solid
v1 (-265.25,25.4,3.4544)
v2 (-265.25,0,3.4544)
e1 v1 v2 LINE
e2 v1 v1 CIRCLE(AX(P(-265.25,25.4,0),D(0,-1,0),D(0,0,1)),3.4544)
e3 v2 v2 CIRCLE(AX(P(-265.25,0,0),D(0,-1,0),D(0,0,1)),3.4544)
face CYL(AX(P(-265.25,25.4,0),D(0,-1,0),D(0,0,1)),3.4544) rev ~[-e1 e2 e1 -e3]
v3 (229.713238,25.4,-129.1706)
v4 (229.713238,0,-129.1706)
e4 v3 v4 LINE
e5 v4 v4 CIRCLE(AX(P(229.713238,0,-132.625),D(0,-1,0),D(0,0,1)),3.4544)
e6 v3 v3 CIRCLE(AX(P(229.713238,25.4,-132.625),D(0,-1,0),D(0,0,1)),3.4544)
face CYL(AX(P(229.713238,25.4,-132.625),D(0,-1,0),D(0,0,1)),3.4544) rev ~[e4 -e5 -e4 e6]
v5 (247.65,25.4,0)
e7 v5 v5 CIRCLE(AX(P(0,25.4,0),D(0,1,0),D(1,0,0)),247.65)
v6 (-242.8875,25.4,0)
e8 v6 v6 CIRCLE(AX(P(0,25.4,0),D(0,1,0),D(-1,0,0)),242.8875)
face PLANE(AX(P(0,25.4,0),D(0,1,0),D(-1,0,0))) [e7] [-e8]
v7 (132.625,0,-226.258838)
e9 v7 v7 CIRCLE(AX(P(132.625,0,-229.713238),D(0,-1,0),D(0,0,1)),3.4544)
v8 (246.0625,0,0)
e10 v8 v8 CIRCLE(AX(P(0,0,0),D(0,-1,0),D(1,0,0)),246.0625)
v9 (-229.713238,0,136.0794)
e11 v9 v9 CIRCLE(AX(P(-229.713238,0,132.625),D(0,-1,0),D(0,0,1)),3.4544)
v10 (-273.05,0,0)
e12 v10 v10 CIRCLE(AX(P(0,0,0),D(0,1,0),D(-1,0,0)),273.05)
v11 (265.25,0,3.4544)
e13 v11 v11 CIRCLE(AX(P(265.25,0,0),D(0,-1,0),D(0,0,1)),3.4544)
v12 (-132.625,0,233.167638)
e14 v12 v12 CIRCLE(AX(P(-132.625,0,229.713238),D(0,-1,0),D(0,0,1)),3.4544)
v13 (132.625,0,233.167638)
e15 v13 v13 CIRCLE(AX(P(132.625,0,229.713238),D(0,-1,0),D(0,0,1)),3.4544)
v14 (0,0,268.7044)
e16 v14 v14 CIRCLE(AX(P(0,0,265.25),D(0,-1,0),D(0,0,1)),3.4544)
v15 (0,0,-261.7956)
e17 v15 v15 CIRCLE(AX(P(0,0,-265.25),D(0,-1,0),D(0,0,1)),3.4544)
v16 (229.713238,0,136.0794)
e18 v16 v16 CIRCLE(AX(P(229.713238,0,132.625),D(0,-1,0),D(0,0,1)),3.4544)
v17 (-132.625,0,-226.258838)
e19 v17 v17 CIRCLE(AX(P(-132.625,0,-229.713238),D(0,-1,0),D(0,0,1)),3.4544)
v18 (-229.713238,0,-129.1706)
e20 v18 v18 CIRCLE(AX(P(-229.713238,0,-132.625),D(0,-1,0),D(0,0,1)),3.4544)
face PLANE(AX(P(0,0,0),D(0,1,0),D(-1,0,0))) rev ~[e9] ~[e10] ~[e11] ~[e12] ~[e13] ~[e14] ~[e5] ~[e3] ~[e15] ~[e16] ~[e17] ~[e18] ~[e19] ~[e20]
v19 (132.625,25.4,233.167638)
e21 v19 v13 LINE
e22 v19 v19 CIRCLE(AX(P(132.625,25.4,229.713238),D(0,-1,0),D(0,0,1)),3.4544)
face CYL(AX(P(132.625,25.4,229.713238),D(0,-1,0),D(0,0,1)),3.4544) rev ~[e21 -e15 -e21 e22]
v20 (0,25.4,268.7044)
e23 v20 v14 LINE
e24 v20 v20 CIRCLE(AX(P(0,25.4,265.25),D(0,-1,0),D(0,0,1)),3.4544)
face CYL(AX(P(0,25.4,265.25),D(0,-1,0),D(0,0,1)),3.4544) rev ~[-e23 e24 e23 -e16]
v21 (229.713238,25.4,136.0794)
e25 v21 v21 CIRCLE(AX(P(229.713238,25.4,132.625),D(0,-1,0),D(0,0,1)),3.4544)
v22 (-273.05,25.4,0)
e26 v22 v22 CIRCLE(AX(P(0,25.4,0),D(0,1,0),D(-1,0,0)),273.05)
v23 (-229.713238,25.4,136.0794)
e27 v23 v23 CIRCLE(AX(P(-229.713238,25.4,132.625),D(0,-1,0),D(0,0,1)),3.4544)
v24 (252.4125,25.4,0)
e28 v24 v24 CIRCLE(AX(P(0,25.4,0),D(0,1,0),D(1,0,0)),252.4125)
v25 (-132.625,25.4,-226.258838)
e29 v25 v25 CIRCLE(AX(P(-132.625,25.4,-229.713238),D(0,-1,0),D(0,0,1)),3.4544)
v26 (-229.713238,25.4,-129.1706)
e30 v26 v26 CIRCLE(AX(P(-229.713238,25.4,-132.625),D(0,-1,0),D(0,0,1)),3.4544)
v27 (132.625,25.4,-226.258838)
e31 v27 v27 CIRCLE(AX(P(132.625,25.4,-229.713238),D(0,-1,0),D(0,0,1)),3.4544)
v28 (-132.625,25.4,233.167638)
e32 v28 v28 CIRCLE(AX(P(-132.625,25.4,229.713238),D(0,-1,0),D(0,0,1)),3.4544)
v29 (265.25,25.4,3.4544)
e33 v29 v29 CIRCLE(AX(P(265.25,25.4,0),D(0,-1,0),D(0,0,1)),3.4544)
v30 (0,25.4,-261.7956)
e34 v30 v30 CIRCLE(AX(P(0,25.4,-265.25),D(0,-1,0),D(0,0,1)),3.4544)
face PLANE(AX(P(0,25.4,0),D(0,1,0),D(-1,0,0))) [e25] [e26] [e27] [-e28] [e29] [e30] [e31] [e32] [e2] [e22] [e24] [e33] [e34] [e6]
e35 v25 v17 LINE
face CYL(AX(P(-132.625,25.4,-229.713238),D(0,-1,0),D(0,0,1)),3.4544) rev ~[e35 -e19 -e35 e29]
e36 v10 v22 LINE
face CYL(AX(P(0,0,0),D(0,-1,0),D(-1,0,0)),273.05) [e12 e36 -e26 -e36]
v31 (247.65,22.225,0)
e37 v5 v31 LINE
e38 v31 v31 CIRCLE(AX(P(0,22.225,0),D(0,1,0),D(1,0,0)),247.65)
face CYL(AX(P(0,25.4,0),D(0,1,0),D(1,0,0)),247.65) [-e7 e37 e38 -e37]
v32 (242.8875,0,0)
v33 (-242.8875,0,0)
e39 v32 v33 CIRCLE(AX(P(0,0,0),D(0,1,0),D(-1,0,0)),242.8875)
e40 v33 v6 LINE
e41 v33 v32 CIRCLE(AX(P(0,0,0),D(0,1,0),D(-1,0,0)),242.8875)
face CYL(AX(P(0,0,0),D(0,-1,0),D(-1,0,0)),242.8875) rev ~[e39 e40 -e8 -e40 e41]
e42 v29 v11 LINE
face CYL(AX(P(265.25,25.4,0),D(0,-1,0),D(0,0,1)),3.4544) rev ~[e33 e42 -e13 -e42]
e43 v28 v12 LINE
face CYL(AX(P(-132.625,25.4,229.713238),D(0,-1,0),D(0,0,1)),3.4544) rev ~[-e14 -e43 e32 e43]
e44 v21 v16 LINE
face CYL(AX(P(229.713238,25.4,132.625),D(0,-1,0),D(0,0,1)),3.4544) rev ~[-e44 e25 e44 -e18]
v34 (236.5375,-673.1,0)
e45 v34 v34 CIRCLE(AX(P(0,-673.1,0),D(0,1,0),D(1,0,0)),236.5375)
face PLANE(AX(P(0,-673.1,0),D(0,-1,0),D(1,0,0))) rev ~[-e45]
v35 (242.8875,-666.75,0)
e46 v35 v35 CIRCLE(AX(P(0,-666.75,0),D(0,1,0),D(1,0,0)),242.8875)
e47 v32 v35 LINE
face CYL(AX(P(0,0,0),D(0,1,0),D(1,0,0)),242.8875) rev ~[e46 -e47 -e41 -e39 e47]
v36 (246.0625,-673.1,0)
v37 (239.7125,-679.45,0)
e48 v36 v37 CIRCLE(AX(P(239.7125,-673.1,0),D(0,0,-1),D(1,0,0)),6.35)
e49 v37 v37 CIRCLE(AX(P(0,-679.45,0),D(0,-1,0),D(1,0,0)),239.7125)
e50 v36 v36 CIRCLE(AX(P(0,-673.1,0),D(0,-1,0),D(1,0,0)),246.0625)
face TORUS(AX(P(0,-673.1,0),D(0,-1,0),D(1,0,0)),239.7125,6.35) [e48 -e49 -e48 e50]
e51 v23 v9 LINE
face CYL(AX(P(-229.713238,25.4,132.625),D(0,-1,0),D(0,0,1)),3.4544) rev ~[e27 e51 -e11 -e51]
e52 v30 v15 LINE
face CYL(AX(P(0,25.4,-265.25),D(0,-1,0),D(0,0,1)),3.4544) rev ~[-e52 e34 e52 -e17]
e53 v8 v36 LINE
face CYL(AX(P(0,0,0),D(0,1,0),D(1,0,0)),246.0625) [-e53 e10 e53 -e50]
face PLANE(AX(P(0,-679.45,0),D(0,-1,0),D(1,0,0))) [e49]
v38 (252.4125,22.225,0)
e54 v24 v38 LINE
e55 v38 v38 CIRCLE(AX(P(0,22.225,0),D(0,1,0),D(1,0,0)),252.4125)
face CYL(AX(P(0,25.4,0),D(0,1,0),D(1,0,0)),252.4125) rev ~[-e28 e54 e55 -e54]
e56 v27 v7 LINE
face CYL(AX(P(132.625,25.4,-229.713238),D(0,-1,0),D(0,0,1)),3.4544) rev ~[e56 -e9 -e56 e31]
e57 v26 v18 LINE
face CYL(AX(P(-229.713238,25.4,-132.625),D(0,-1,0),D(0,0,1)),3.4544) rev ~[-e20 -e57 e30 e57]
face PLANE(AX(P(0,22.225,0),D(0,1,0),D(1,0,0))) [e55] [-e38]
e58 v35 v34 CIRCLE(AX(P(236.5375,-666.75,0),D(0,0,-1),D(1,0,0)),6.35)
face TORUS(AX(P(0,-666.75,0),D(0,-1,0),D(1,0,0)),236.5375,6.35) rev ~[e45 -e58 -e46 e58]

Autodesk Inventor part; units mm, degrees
ref_plane "YZ Plane" through (0, 0, 0) normal (1, 0, 0) x (0, 1, 0)
ref_plane "XZ Plane" through (0, 0, 0) normal (0, 1, 0) x (-1, 0, 0)
ref_plane "XY Plane" through (0, 0, 0) normal (0, 0, 1) x (1, 0, 0)
sketch "Sketch1" plane through (0, 0, 0) normal (0, 1, 0) x (-1, 0, 0)
  circle A0 centre (0, 0) radius 273.05
  circle A1 centre (0, 0) radius 242.8875
  dimension "d0" = 546.1
  dimension "d1" = 485.775
extrude "Extrusion1" add sketch "Sketch1" along normal blind 25.4
sketch "Sketch2" plane through (0, 25.4, 0) normal (0, 1, 0) x (1, 0, 0)
  circle A0 centre (0, 0) radius 247.65
  circle A1 centre (0, 0) radius 252.4125
  dimension "d4" = 495.3
  dimension "d5" = 504.825
extrude "Extrusion2" cut sketch "Sketch2" against normal blind 3.175
sketch "Sketch3" plane through (0, 25.4, 0) normal (0, 1, 0) x (1, 0, 0)
  line L0 (0, 0) -> (-265.25, 0) construction
  dimension "d8" = 265.25
hole "Hole1" at (-265.25, 25.4, 0) direction (0, -1, 0) diameter 6.9088 end up to surface
pattern_circular "Circular Pattern1" count 12 over 360 about axis through (0, -10, 0) along (0, 1, 0) of "Hole1"
sketch "Sketch4" plane through (0, 0, 0) normal (0, -1, 0) x (1, 0, 0)
  circle A0 centre (0, 0) radius 242.8875
  circle A1 centre (0, 0) radius 246.0625
  dimension "d19" = 485.775
  dimension "d20" = 492.125
extrude "Extrusion3" add sketch "Sketch4" along normal blind 679.45
sketch "Sketch8" plane through (0, -679.45, 0) normal (0, -1, 0) x (1, 0, 0)
  circle A0 centre (0, 0) radius 246.0625
  dimension "d45" = 492.125
extrude "Extrusion6" add sketch "Sketch8" against normal blind 6.35
fillet "Fillet1" radius 6.35 2 edges at (-246.0625, -679.45, 0) (-242.8875, -673.1, 0)
properties part number "vacuum jacket long" material "Aluminum 6061"
